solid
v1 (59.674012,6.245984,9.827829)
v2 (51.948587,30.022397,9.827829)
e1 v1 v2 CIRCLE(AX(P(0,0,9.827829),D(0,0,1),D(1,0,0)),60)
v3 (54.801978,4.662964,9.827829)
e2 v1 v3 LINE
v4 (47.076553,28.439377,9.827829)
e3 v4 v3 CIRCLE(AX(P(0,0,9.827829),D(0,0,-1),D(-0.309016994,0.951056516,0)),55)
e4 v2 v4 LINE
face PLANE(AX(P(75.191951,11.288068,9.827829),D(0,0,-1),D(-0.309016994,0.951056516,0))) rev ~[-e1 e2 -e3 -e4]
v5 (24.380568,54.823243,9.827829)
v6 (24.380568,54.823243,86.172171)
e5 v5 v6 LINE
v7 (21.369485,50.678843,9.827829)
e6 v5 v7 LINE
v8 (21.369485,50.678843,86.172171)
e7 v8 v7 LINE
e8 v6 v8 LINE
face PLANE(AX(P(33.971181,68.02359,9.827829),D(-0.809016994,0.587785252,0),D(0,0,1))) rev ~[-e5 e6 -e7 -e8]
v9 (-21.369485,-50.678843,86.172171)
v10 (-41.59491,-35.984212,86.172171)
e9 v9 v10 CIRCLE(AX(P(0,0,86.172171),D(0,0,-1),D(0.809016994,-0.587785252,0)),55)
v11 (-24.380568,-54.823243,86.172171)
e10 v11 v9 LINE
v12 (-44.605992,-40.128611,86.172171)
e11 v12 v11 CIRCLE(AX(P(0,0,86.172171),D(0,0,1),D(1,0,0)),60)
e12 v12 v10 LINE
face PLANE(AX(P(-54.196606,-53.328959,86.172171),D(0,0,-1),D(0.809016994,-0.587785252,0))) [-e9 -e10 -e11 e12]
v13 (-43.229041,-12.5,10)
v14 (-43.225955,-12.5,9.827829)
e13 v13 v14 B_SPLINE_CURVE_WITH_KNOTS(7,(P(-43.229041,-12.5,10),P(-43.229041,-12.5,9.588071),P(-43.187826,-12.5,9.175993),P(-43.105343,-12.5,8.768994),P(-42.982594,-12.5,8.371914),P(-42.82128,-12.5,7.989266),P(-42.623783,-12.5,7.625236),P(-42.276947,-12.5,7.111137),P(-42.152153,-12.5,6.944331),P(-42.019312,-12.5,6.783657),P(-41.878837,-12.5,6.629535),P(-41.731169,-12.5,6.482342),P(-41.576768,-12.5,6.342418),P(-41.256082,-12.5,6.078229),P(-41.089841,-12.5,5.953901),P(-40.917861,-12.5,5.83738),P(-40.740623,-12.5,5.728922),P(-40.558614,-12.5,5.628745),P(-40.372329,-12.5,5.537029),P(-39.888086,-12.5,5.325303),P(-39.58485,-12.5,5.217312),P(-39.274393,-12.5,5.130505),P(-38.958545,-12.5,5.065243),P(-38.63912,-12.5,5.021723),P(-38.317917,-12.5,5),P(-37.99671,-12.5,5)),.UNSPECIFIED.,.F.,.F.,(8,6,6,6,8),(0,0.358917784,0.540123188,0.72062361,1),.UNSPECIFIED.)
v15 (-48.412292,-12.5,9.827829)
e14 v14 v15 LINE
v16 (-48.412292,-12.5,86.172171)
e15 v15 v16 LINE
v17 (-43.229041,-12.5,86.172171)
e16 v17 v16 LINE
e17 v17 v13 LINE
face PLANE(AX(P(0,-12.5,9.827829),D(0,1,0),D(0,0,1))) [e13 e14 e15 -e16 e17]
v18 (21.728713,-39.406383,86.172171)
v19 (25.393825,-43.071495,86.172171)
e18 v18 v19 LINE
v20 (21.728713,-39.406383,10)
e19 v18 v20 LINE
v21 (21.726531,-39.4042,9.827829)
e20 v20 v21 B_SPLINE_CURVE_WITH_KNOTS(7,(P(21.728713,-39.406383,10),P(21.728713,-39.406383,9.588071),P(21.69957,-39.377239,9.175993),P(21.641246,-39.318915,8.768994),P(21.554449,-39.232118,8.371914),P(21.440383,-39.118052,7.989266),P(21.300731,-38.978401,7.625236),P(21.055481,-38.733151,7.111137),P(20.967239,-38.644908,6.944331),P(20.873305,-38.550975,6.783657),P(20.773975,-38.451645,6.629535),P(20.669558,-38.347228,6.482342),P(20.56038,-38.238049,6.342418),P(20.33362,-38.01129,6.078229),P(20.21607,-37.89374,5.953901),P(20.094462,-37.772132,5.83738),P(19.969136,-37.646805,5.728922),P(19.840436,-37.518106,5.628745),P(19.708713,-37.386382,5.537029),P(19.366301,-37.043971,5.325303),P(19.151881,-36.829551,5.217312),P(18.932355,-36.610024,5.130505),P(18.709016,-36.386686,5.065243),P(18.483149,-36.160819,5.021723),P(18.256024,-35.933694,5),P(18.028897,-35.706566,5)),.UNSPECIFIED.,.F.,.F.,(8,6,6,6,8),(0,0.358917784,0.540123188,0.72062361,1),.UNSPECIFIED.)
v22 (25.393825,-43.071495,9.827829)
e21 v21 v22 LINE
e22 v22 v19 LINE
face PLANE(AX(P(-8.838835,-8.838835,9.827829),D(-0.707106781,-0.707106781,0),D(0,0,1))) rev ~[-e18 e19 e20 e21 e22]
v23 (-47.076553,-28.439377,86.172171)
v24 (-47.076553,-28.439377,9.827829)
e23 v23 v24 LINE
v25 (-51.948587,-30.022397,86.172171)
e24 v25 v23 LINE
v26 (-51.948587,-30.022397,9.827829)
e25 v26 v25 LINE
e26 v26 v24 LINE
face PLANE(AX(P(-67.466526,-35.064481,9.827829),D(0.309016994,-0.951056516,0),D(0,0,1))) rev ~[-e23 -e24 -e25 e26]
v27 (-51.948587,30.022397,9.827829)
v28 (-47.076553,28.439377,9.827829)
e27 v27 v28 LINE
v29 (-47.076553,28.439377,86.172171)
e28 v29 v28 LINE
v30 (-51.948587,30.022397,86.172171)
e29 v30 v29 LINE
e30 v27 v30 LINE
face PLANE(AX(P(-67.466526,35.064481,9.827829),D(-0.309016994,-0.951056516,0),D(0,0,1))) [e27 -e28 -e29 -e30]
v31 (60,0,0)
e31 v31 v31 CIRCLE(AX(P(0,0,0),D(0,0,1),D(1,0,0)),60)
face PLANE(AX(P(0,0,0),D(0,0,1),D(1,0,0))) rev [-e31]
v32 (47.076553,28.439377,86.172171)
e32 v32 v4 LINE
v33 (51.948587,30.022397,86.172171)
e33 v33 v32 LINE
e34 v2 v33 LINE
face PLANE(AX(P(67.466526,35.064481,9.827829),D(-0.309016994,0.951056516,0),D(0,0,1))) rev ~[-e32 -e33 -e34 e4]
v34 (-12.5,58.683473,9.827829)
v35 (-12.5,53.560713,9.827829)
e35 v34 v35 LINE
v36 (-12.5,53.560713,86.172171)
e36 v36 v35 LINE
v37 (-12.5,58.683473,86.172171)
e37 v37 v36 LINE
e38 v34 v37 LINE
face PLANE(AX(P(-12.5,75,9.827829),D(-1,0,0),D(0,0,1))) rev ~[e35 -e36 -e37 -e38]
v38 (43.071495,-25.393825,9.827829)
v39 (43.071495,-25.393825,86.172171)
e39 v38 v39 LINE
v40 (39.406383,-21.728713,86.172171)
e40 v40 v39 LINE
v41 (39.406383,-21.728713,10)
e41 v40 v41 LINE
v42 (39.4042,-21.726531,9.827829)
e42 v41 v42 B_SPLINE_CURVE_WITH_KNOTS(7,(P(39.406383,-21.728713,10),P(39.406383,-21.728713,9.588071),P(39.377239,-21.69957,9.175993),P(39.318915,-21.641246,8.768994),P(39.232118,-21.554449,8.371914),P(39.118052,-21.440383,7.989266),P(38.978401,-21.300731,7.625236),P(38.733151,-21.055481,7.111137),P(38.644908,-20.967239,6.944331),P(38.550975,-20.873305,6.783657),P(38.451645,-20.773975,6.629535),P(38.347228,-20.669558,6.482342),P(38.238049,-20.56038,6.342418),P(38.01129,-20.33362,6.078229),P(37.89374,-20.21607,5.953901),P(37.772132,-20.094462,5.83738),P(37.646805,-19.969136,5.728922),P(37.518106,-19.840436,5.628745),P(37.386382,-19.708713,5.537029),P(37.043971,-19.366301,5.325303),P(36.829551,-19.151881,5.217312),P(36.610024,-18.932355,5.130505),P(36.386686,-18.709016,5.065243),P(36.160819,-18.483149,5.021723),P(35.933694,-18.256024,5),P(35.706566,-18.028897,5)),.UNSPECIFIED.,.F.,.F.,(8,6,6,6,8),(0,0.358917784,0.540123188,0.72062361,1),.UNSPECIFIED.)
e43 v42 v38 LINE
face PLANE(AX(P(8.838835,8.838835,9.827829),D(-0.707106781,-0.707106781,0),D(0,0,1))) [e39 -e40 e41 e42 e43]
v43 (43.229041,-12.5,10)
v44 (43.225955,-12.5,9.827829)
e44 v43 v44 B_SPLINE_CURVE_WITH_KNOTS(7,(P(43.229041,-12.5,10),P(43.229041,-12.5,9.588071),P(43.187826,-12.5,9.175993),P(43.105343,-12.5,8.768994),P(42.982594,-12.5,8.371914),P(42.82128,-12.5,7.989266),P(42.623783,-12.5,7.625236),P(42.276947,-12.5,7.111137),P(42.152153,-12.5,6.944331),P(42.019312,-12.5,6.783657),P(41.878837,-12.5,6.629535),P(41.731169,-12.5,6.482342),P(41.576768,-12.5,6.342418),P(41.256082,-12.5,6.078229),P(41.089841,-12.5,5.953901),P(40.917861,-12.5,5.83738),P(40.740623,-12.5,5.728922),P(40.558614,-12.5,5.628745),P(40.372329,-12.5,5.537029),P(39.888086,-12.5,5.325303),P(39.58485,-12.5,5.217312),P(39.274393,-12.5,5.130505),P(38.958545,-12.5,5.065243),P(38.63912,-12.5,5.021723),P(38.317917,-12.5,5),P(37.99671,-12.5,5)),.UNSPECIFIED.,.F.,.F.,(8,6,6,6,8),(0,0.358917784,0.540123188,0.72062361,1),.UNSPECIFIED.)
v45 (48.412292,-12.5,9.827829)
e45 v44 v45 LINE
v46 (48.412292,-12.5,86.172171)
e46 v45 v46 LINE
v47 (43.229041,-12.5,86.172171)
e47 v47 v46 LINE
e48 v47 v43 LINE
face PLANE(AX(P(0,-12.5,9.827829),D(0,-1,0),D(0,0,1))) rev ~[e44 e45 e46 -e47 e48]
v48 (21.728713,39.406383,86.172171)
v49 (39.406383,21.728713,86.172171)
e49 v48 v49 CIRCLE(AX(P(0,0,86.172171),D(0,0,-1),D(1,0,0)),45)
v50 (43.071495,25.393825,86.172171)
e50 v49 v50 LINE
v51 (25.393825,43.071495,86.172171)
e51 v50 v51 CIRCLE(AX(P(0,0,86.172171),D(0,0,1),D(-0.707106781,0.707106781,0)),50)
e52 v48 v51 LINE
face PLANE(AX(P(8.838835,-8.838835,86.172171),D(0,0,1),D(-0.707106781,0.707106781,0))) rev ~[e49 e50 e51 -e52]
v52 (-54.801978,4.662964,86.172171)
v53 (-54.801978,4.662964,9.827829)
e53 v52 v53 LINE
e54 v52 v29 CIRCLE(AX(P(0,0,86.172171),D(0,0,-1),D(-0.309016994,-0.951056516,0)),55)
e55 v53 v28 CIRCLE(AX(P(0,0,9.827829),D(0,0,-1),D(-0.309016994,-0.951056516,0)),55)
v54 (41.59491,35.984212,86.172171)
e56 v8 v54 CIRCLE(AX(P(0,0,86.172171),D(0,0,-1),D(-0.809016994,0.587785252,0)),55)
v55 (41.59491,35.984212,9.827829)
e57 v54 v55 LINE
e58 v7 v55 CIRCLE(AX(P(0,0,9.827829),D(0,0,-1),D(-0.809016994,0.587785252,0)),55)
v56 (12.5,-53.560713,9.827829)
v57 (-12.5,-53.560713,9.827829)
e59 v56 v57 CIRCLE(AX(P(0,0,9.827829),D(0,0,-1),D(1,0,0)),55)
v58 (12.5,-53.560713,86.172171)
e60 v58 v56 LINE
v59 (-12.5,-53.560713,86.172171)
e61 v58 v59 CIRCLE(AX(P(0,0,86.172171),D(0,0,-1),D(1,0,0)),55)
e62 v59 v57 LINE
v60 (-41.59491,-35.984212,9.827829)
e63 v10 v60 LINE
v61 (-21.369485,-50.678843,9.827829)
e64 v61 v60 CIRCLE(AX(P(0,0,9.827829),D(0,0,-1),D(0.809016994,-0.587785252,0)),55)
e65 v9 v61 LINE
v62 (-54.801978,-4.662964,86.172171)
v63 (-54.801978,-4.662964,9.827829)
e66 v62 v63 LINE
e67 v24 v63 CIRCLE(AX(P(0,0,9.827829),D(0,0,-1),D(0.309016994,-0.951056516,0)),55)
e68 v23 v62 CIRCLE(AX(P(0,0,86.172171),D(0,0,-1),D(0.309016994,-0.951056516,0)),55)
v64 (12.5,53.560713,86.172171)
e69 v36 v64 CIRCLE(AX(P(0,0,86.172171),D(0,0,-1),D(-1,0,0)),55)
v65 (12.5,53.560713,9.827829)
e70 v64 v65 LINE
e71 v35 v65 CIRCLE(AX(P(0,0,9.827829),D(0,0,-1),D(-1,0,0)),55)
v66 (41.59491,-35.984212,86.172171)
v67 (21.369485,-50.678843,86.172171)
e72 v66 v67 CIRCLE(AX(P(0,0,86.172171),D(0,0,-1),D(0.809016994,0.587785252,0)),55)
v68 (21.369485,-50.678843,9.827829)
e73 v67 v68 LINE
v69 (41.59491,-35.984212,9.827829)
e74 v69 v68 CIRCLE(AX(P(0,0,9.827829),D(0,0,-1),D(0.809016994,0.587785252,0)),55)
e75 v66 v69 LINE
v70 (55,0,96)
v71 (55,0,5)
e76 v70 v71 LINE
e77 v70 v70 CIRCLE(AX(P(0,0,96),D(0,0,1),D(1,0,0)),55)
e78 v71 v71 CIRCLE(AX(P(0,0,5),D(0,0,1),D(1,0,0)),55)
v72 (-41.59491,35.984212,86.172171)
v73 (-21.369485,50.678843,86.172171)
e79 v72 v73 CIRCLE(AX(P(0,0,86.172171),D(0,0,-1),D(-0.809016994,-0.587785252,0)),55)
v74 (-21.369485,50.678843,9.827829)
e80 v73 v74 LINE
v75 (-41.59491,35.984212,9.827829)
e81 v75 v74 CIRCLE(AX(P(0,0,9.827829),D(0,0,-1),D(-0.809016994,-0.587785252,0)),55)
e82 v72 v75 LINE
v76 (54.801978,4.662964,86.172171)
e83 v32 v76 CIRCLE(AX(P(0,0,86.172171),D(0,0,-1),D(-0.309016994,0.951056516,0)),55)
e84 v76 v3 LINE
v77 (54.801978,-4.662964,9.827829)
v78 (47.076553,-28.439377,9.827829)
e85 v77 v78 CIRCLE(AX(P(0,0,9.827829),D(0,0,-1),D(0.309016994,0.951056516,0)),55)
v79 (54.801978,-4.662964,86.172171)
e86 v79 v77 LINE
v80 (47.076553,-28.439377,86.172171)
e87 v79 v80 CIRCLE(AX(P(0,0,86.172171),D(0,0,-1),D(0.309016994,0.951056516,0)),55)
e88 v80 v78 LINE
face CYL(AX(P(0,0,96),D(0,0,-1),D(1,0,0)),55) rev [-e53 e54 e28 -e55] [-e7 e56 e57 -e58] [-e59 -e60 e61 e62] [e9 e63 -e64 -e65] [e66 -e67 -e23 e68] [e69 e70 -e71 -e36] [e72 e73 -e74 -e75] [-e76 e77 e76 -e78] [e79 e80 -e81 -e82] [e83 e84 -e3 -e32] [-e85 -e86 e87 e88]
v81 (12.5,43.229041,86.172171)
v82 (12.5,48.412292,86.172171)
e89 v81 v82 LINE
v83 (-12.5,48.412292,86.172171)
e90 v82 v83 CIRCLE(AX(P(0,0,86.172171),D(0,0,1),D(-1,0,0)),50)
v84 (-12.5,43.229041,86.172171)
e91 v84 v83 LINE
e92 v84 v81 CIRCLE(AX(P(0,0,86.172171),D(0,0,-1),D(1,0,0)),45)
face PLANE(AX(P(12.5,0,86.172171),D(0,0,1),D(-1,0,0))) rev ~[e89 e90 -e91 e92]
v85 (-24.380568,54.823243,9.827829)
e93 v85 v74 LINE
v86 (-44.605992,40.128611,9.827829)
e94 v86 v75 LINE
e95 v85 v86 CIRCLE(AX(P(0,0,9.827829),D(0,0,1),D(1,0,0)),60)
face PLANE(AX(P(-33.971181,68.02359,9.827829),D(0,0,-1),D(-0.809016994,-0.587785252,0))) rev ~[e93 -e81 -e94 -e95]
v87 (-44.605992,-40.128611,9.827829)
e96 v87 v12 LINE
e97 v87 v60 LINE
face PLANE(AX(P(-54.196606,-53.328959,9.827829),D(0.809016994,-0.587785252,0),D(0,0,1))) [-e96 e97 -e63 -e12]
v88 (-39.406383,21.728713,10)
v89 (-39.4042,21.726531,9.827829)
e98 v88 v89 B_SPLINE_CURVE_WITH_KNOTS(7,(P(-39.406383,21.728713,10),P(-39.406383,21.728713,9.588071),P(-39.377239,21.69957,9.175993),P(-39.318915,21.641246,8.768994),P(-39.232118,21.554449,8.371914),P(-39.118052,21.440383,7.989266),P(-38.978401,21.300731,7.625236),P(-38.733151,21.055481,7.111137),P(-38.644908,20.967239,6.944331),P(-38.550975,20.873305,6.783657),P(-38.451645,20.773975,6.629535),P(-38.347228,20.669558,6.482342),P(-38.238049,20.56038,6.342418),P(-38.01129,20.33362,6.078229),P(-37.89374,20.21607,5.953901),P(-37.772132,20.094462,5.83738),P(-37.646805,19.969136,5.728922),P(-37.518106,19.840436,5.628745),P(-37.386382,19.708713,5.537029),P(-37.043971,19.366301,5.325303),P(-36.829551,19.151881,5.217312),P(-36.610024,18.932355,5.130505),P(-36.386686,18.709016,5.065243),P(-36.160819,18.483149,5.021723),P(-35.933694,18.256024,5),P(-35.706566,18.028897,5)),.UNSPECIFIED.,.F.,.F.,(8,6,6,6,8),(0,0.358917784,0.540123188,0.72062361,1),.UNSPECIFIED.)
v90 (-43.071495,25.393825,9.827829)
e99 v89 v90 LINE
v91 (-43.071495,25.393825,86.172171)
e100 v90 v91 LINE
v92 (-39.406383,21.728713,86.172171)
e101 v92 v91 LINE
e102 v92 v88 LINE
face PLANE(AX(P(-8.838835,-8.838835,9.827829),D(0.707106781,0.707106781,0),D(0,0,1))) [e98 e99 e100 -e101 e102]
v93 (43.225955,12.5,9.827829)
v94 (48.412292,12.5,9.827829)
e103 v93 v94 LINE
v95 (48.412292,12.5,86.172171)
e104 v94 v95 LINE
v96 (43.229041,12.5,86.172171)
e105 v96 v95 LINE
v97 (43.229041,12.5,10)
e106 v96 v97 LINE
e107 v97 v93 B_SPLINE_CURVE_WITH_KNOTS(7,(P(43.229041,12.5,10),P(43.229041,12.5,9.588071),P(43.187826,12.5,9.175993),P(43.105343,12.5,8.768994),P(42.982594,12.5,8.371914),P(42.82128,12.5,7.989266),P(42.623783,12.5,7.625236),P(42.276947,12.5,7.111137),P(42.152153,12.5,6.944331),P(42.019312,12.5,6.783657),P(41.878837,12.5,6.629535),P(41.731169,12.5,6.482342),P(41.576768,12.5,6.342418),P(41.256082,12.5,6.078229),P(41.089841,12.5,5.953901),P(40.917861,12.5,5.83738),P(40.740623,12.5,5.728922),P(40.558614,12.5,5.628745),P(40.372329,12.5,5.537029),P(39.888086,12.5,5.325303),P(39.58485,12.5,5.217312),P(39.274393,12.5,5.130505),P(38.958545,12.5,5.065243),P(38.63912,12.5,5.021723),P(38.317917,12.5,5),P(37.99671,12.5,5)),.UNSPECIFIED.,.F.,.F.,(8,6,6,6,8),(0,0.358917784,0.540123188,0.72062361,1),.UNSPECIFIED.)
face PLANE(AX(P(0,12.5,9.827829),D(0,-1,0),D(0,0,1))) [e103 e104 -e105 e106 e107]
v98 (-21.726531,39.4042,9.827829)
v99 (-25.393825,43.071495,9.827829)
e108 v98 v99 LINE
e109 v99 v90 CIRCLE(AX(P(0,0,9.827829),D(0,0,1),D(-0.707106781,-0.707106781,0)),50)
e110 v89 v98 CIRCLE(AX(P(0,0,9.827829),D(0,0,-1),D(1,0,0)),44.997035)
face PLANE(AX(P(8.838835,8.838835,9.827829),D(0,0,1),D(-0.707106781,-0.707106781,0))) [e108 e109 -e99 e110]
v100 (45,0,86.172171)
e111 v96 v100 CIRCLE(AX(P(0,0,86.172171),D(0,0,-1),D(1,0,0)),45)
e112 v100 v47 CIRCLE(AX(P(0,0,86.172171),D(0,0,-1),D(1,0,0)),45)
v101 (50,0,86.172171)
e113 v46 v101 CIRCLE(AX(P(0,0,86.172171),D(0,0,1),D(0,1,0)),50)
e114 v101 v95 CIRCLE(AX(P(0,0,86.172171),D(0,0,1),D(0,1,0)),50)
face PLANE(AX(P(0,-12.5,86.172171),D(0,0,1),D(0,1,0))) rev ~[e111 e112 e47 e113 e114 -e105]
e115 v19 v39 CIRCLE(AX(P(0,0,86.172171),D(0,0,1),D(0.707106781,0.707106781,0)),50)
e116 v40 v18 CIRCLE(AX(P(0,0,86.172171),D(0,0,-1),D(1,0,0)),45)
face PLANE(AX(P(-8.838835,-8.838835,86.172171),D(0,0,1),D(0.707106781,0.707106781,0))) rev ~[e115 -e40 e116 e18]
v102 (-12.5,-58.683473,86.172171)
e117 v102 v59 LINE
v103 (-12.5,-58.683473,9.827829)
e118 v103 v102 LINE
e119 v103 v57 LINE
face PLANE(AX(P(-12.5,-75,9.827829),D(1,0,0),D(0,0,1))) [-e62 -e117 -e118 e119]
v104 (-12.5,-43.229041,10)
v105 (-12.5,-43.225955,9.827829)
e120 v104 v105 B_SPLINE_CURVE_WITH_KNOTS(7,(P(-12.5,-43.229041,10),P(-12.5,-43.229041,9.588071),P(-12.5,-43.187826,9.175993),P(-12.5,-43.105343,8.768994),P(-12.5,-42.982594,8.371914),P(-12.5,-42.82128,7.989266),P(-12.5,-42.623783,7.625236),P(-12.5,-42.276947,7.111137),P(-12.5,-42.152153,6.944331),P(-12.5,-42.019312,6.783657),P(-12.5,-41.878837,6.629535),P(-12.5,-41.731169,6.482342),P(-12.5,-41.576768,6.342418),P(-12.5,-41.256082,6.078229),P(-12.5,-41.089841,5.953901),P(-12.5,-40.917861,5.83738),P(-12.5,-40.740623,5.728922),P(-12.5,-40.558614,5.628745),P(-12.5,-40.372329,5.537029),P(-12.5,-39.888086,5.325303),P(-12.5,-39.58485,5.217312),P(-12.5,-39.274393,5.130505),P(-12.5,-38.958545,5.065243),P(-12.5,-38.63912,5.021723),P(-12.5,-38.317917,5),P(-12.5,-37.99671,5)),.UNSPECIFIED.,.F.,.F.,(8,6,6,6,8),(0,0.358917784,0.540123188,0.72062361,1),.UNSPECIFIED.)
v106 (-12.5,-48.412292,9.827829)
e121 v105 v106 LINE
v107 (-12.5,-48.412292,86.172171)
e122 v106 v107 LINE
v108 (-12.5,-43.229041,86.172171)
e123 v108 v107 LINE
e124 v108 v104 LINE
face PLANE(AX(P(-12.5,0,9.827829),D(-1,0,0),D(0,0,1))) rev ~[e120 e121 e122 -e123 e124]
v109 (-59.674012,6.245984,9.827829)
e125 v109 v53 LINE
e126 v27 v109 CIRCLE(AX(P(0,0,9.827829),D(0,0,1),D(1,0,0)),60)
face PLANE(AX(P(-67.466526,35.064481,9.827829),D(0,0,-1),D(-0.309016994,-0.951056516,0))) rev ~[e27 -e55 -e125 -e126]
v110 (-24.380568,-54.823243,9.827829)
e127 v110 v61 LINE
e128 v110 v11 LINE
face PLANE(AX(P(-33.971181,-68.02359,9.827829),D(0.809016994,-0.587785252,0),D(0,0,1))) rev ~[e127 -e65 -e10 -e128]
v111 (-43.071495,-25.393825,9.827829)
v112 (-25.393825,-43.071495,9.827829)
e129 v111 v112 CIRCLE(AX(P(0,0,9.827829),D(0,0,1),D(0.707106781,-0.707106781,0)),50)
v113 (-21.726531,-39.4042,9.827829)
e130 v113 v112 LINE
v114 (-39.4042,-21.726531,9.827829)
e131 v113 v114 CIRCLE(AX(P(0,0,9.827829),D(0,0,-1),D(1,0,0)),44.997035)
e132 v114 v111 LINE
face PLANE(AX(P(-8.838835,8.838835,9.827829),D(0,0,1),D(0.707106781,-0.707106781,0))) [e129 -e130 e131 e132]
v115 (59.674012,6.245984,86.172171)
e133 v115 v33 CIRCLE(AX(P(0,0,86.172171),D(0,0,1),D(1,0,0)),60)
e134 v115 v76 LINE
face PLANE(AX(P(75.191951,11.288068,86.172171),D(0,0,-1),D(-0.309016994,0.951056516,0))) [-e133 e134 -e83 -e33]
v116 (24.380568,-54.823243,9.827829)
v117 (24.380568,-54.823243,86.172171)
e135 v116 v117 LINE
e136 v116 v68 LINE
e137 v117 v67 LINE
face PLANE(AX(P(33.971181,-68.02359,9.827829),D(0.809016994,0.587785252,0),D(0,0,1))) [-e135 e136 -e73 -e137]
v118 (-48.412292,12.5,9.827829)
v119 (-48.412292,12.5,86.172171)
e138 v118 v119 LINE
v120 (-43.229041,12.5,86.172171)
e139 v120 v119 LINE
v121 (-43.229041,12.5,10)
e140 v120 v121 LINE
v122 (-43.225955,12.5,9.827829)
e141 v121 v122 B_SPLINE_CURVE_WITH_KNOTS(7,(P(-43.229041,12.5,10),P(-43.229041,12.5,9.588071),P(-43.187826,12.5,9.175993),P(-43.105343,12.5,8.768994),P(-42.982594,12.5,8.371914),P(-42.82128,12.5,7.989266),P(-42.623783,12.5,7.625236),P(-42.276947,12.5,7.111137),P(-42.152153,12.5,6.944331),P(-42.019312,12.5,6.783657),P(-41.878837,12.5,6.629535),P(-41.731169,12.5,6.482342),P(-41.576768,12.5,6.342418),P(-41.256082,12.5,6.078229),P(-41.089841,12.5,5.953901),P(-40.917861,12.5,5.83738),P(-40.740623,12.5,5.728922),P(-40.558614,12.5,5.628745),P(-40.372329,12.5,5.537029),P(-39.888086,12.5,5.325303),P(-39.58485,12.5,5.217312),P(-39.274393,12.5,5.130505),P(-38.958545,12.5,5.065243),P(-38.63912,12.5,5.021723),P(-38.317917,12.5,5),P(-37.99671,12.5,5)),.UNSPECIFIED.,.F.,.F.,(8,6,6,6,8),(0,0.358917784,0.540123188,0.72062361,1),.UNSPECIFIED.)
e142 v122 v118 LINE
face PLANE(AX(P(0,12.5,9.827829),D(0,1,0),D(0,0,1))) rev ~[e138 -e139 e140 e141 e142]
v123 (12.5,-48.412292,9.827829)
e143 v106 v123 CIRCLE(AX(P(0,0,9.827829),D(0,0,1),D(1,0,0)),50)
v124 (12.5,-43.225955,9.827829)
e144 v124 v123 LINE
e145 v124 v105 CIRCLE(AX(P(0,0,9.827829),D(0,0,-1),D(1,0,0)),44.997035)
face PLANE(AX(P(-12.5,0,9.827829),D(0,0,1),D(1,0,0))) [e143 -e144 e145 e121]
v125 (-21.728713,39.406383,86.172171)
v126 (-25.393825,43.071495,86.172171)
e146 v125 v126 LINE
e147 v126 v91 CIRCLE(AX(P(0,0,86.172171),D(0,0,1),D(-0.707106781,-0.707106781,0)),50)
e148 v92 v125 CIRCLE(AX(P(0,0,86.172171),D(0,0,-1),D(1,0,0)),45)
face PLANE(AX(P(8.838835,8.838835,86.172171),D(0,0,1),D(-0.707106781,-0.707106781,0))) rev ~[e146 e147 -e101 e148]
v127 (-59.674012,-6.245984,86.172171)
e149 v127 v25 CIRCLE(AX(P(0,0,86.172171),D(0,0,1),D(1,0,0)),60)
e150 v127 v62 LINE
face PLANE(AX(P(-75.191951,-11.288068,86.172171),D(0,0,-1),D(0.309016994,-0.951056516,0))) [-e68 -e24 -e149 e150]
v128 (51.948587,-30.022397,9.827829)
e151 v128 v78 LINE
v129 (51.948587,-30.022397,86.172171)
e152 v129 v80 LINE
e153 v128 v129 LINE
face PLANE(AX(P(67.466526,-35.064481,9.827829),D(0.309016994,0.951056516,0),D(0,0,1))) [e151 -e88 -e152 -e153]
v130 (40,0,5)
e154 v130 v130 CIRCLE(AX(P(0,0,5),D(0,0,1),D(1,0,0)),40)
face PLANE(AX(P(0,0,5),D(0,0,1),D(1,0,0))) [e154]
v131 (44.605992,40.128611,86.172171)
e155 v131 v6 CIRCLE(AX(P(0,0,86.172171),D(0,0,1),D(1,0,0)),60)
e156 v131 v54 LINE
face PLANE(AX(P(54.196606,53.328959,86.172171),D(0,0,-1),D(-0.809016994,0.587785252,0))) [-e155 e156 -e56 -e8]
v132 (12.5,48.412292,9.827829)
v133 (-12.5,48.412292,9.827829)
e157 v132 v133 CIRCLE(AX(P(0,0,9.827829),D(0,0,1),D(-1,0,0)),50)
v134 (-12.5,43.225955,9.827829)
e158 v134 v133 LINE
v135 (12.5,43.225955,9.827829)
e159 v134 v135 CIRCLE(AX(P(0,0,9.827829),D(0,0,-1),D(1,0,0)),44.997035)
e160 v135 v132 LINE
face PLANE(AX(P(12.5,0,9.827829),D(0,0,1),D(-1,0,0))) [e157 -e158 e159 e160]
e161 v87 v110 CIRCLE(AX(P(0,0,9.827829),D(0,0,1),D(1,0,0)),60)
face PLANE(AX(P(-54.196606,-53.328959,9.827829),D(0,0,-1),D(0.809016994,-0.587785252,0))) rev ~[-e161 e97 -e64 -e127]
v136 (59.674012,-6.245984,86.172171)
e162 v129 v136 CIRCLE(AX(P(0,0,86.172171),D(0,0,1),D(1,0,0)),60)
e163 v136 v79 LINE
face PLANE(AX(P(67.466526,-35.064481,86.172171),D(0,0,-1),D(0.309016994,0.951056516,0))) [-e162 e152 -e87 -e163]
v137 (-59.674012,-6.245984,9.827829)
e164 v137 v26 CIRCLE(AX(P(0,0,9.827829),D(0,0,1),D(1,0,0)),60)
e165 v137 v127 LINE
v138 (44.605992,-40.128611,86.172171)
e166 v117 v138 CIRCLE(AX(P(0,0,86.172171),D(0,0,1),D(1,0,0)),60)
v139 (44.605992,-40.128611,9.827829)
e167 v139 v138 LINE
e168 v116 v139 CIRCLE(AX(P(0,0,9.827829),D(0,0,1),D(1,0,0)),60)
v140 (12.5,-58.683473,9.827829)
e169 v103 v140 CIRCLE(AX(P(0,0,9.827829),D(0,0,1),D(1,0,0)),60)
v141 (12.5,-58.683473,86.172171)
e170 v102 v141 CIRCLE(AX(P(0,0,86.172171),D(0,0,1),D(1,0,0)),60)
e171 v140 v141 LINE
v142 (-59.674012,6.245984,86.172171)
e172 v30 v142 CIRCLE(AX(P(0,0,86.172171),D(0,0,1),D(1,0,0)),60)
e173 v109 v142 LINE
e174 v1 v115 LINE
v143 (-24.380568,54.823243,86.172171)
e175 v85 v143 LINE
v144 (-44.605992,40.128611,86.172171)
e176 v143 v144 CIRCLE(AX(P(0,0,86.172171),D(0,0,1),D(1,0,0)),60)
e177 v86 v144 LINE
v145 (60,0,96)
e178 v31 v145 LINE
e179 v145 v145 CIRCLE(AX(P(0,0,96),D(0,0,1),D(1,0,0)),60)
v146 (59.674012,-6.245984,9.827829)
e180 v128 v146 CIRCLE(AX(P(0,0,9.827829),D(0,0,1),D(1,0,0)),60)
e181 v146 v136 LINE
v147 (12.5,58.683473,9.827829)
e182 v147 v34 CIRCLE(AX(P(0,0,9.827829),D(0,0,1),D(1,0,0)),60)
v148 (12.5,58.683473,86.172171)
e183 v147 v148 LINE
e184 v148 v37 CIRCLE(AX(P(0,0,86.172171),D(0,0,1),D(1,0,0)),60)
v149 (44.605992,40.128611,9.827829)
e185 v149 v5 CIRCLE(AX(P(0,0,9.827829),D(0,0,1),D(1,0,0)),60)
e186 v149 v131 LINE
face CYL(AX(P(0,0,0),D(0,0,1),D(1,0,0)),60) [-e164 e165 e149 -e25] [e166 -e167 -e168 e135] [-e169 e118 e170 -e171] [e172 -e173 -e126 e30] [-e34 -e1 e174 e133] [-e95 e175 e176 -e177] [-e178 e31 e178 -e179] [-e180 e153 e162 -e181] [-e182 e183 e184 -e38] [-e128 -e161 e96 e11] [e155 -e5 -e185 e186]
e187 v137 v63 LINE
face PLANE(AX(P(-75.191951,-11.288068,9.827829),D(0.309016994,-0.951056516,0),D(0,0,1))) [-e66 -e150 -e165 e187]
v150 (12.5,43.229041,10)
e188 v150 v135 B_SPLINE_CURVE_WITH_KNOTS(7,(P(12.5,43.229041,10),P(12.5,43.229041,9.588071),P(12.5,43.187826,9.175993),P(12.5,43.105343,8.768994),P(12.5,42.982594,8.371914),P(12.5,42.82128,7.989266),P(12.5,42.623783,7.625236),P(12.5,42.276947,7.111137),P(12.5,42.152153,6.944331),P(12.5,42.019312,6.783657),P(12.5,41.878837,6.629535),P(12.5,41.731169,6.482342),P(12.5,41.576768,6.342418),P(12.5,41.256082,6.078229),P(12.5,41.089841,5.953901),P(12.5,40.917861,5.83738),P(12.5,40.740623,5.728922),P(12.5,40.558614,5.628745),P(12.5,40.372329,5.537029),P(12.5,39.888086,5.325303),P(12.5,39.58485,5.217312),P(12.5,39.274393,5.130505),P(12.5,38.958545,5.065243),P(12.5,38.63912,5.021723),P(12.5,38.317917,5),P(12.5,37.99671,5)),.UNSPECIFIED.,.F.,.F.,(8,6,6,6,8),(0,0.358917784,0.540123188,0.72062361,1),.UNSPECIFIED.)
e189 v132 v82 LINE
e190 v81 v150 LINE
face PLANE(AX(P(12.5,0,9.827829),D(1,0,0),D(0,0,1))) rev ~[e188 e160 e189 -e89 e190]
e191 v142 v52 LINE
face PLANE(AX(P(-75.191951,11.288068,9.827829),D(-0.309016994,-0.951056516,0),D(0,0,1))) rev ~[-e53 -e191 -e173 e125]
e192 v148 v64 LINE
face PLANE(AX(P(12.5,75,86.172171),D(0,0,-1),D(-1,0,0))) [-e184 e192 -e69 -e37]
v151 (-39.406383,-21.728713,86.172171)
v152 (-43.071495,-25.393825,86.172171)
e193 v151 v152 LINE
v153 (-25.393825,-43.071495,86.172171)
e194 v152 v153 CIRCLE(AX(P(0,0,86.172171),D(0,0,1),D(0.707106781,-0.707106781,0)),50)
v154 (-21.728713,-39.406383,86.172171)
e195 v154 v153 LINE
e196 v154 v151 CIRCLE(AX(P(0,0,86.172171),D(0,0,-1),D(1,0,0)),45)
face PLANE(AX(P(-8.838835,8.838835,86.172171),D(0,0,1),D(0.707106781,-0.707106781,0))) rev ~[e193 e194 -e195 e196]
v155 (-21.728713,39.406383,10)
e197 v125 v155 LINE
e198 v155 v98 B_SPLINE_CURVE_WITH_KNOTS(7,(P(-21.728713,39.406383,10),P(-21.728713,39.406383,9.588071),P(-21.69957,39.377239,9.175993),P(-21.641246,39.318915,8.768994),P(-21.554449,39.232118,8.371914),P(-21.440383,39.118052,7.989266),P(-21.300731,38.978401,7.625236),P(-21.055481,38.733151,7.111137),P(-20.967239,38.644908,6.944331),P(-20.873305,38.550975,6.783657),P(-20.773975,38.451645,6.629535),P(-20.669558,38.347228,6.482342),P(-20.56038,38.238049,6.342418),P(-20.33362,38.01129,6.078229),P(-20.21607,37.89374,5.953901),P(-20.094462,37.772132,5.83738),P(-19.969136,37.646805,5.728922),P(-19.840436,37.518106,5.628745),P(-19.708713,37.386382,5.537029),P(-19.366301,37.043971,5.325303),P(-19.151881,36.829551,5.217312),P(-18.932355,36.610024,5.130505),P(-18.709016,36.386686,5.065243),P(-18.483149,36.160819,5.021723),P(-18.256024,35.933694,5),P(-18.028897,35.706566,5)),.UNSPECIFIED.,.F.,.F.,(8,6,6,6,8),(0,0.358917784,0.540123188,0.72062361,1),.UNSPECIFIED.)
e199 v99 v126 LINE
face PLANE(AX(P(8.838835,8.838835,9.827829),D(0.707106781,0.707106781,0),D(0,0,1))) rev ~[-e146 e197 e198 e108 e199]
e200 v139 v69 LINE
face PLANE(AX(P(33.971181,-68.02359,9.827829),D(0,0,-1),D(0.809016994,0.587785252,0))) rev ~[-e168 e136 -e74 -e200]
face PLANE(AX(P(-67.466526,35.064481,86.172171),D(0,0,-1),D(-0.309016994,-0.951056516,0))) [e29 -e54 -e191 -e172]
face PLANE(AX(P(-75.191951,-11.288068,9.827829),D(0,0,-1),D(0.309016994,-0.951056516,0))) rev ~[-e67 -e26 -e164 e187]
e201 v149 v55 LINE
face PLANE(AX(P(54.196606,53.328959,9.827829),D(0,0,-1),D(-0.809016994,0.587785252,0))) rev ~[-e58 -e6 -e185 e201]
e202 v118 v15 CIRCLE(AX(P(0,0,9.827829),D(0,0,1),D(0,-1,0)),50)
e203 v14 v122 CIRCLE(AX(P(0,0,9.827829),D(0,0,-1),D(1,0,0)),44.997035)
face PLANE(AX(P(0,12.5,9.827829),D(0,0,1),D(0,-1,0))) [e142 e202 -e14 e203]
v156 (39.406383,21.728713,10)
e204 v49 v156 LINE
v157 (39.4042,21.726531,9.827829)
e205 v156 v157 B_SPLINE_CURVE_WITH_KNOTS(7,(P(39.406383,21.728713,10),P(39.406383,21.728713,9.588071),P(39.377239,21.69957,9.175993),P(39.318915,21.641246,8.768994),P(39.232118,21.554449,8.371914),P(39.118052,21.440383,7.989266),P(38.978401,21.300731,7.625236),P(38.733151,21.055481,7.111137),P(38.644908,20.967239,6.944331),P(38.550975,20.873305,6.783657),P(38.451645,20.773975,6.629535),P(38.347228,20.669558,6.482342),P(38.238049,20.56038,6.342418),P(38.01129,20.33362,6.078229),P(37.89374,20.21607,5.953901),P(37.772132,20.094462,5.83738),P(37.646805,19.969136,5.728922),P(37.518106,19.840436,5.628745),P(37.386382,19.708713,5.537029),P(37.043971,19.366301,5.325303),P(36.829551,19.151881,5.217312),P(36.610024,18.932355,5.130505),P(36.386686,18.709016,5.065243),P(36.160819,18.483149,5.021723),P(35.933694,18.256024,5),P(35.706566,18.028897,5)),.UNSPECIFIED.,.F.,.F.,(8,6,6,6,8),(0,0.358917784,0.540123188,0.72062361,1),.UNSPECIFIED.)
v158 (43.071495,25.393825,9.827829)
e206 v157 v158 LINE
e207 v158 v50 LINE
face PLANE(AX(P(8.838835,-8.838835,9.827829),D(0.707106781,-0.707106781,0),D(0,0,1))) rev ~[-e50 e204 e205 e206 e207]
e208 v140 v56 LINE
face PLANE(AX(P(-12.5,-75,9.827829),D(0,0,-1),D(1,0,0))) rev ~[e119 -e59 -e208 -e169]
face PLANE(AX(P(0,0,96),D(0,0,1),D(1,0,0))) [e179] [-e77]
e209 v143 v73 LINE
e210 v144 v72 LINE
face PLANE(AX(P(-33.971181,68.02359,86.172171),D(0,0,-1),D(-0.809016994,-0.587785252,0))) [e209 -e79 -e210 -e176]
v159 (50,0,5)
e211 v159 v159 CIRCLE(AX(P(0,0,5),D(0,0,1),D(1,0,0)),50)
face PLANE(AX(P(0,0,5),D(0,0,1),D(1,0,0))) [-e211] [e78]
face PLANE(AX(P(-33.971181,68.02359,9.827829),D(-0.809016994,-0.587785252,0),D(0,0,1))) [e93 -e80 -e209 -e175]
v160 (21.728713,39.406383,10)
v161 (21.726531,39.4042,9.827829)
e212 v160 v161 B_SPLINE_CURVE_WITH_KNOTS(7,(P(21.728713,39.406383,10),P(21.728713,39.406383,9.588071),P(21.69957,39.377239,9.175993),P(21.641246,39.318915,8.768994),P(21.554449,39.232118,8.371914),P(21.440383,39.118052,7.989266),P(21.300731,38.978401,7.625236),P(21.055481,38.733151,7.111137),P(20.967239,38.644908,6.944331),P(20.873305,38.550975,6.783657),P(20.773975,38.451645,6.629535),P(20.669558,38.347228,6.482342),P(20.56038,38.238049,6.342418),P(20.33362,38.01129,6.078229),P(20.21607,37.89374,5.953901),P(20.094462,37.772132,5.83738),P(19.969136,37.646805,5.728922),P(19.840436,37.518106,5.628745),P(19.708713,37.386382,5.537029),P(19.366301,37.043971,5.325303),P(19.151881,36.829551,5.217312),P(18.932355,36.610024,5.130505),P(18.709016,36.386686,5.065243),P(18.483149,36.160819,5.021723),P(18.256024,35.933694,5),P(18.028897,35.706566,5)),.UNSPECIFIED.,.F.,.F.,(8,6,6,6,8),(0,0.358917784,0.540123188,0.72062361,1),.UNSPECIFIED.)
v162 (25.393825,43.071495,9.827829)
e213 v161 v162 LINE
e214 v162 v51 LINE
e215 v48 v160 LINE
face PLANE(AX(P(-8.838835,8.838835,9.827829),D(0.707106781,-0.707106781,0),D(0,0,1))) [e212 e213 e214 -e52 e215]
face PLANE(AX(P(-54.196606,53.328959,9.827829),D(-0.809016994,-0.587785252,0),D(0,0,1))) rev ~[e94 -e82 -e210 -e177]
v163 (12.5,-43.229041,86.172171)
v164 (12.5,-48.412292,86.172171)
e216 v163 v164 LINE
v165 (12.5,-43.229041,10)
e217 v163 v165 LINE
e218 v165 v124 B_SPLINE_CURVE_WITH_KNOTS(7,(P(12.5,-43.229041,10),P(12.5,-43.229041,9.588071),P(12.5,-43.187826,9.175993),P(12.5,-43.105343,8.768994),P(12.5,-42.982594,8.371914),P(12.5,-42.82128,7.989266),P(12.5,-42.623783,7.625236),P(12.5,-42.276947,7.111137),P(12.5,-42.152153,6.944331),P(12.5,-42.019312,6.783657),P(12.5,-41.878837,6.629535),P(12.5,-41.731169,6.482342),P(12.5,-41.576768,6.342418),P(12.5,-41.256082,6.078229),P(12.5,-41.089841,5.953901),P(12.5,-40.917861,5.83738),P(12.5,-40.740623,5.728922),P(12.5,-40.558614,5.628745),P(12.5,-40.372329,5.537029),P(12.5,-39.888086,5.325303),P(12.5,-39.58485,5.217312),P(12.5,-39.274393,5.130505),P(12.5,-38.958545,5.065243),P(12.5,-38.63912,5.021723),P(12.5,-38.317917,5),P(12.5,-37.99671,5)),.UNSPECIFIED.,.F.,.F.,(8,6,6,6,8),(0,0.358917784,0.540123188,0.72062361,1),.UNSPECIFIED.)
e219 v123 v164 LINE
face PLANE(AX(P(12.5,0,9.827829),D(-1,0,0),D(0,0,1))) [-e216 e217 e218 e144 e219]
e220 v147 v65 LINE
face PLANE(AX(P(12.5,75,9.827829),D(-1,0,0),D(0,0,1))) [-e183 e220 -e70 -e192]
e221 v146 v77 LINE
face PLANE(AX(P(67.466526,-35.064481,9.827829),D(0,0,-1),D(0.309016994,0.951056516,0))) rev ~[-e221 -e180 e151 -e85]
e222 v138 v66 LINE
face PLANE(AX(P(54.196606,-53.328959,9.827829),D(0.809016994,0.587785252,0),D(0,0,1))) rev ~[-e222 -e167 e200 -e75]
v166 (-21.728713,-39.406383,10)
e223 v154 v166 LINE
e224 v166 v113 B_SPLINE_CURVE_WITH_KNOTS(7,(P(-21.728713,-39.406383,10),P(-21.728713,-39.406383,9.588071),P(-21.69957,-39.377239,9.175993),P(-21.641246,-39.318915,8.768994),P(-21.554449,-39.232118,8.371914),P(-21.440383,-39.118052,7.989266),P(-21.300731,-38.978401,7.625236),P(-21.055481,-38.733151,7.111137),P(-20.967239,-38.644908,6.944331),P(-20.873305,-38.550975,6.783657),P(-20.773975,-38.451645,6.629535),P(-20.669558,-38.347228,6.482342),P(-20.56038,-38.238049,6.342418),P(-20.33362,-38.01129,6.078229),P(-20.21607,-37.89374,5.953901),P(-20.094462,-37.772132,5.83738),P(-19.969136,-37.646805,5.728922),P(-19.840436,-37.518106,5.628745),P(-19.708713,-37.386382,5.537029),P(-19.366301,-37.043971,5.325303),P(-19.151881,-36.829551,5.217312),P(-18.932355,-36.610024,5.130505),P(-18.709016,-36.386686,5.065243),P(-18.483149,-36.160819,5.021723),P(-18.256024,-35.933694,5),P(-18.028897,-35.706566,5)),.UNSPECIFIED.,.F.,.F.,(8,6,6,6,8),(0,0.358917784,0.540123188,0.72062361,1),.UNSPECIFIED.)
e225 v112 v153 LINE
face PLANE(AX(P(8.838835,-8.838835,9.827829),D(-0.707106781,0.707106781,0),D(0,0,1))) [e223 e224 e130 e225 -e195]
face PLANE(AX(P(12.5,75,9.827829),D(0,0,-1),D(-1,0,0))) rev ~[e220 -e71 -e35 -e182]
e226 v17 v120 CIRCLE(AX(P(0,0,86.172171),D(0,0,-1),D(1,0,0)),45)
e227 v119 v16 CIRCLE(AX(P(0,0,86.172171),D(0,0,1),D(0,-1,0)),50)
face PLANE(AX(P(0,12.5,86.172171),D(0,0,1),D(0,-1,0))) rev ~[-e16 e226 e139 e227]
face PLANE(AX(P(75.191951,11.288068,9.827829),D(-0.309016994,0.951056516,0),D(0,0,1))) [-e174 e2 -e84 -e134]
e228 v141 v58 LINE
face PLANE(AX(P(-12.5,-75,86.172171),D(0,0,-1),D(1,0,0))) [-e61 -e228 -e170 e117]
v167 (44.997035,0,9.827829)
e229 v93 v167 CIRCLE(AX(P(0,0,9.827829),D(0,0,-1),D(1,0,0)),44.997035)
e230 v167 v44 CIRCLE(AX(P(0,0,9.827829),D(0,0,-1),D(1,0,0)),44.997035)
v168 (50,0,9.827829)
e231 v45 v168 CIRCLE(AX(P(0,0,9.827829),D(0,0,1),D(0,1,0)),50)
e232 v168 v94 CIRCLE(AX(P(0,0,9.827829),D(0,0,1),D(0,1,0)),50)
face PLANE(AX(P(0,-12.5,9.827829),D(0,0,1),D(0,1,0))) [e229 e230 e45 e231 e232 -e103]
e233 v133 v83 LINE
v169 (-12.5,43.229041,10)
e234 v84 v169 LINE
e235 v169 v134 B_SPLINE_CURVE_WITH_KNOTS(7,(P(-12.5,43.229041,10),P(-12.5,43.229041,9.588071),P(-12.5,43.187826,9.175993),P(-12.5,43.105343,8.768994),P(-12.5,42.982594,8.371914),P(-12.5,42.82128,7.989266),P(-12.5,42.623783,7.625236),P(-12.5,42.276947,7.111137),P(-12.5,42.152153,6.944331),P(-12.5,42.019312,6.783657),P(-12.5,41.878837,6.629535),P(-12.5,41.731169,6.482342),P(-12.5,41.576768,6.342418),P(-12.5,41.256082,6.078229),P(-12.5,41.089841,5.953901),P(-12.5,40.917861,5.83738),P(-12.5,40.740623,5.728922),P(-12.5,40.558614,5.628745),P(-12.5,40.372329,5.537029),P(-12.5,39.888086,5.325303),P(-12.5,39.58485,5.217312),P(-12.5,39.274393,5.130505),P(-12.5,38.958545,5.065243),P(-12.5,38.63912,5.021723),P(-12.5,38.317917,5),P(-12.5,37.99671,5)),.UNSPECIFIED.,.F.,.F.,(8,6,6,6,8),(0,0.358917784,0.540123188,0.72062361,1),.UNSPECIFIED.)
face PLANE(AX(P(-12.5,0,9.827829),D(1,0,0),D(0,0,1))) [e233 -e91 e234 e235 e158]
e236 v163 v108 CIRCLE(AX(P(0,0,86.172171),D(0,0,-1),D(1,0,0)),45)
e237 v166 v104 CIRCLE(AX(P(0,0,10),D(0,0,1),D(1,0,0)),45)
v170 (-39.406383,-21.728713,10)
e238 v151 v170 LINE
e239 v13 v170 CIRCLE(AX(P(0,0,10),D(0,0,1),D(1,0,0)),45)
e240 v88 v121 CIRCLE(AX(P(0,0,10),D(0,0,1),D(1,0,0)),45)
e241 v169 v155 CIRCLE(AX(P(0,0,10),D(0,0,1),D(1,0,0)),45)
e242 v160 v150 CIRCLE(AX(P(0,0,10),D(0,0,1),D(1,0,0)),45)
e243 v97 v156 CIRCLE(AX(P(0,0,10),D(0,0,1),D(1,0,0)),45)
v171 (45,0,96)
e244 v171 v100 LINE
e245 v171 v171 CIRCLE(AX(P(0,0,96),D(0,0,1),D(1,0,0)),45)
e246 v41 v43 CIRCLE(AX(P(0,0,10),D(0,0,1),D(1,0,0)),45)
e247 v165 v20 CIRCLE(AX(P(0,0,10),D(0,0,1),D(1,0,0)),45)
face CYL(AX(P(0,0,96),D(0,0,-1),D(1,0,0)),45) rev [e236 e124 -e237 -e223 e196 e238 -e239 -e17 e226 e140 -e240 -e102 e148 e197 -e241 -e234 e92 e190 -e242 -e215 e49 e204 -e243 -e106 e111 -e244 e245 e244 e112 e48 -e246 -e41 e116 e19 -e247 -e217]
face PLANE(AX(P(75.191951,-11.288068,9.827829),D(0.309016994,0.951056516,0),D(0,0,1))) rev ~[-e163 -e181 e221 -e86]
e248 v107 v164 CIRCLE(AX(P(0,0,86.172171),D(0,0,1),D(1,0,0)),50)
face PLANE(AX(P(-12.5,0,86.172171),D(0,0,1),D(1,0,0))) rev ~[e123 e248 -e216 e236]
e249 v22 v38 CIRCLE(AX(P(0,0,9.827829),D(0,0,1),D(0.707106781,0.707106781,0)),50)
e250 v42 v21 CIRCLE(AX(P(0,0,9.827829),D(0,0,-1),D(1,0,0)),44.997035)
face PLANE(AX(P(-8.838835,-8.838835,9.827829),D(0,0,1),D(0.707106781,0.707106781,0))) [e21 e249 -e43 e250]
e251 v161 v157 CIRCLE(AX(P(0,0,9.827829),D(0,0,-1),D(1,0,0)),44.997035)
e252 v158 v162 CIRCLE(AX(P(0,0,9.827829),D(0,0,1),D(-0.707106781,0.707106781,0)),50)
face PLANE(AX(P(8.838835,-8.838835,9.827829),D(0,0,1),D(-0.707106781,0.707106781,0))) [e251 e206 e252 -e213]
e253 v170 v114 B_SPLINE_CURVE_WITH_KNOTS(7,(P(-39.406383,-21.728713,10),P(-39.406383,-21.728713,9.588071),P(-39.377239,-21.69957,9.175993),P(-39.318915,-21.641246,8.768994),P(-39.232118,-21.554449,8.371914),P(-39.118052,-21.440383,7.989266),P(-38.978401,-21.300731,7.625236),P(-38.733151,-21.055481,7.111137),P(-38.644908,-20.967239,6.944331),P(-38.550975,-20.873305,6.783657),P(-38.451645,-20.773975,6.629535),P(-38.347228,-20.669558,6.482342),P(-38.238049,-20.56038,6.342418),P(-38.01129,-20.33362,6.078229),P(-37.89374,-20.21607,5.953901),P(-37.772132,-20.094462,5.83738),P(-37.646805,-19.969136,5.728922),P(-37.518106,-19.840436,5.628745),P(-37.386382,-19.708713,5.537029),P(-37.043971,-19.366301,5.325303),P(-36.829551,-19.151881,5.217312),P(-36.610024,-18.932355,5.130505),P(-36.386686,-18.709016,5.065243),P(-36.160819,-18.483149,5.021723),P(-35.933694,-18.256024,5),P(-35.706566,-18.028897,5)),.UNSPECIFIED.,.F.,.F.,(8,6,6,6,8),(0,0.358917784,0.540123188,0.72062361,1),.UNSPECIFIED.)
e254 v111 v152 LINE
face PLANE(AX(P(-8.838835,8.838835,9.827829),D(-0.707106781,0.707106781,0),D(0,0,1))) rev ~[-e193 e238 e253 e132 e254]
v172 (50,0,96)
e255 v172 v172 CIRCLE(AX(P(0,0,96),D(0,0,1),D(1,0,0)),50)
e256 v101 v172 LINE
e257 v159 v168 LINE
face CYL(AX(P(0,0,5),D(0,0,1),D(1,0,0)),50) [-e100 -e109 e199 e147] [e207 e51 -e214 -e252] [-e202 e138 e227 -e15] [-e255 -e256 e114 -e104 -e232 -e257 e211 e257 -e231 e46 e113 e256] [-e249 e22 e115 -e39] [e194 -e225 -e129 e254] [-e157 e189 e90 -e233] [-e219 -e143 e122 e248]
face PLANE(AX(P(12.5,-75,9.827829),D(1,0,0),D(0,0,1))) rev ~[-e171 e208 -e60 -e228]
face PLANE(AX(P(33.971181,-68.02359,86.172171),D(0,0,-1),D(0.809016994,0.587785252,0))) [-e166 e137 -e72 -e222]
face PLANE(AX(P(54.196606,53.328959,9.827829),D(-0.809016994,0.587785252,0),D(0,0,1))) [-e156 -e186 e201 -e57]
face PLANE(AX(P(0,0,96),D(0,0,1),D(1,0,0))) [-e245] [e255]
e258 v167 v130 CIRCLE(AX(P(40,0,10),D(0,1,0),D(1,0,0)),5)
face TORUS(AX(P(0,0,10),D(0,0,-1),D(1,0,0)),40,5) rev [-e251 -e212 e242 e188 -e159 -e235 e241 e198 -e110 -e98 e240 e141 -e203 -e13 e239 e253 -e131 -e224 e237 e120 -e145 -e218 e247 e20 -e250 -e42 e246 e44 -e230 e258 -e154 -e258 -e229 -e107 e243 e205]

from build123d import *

# Parameters (mm, degrees)
F2_W            = 25
F2_H            = 76.3443418741
F3_REACH        = 140.3344210413
F3_COPIES_COUNT = 8
F5_W            = 25
F5_H            = 76.3443418741
F6_REACH        = 215.3344210413
F6_COPIES_COUNT = 10


# Not quite as in the source:
# - a pattern or mirror of a feature is missing from the dataset's text; its kind, count and spacing are read off the source's solid


with BuildPart() as f1:
    # F0 (on Front) → F1 (revolve)
    with BuildSketch(Plane.XZ):
        with BuildLine():
            Line((0, 5), (0, 0))
            Line((0, 0), (60, 0))
            Line((60, 0), (60, 96))
            Line((60, 96), (55, 96))
            Line((55, 96), (55, 5))
            Line((55, 5), (50, 5))
            Line((50, 5), (50, 96))
            Line((50, 96), (45, 96))
            Line((45, 96), (45, 10))
            ThreePointArc((45, 10), (43.5355339059, 6.4644660941), (40, 5))
            Line((40, 5), (0, 5))
        make_face()
    revolve(axis=Axis((0, 0, 2.5), (0, 0, 1)))

    f3_end = f1.faces().sort_by_distance((-50, 0, 50.5))[0]
    # F2 (on Front) → F3 (cut, up to a face of the model that its end follows)
    with BuildSketch(Plane.XZ):
        with Locations((0, 48)):
            Rectangle(F2_W, F2_H)
    f3_long = extrude(amount=F3_REACH, mode=Mode.PRIVATE)
    f3 = split(f3_long, bisect_by=f3_end, keep=Keep.BOTTOM, mode=Mode.PRIVATE)
    add(f3, mode=Mode.SUBTRACT)

    # F3_copies: F3 ×8 about axis
    f3_copies_axis = Axis((0, 0, 0), (0, 0, 1))
    for i in range(1, F3_COPIES_COUNT):
        add(f3.rotate(f3_copies_axis, i * 360 / F3_COPIES_COUNT), mode=Mode.SUBTRACT)

    f6_end = f1.faces().sort_by_distance((-55, 0, 50.5))[0]
    # F5 (on offset) → F6 (cut, up to a face of the model that its end follows)
    with BuildSketch(Plane.XZ.offset(75)):
        with Locations((0, 48)):
            Rectangle(F5_W, F5_H)
    f6_long = extrude(amount=-F6_REACH, mode=Mode.PRIVATE)
    f6 = split(f6_long, bisect_by=f6_end, keep=Keep.ALL, mode=Mode.PRIVATE).solids().sort_by_distance((0, -75, 48))[0]
    add(f6, mode=Mode.SUBTRACT)

    # F6_copies: F6 ×10 about axis
    f6_copies_axis = Axis((0, 0, 0), (0, 0, 1))
    for i in range(1, F6_COPIES_COUNT):
        add(f6.rotate(f6_copies_axis, i * 360 / F6_COPIES_COUNT), mode=Mode.SUBTRACT)


solid = f1.part
